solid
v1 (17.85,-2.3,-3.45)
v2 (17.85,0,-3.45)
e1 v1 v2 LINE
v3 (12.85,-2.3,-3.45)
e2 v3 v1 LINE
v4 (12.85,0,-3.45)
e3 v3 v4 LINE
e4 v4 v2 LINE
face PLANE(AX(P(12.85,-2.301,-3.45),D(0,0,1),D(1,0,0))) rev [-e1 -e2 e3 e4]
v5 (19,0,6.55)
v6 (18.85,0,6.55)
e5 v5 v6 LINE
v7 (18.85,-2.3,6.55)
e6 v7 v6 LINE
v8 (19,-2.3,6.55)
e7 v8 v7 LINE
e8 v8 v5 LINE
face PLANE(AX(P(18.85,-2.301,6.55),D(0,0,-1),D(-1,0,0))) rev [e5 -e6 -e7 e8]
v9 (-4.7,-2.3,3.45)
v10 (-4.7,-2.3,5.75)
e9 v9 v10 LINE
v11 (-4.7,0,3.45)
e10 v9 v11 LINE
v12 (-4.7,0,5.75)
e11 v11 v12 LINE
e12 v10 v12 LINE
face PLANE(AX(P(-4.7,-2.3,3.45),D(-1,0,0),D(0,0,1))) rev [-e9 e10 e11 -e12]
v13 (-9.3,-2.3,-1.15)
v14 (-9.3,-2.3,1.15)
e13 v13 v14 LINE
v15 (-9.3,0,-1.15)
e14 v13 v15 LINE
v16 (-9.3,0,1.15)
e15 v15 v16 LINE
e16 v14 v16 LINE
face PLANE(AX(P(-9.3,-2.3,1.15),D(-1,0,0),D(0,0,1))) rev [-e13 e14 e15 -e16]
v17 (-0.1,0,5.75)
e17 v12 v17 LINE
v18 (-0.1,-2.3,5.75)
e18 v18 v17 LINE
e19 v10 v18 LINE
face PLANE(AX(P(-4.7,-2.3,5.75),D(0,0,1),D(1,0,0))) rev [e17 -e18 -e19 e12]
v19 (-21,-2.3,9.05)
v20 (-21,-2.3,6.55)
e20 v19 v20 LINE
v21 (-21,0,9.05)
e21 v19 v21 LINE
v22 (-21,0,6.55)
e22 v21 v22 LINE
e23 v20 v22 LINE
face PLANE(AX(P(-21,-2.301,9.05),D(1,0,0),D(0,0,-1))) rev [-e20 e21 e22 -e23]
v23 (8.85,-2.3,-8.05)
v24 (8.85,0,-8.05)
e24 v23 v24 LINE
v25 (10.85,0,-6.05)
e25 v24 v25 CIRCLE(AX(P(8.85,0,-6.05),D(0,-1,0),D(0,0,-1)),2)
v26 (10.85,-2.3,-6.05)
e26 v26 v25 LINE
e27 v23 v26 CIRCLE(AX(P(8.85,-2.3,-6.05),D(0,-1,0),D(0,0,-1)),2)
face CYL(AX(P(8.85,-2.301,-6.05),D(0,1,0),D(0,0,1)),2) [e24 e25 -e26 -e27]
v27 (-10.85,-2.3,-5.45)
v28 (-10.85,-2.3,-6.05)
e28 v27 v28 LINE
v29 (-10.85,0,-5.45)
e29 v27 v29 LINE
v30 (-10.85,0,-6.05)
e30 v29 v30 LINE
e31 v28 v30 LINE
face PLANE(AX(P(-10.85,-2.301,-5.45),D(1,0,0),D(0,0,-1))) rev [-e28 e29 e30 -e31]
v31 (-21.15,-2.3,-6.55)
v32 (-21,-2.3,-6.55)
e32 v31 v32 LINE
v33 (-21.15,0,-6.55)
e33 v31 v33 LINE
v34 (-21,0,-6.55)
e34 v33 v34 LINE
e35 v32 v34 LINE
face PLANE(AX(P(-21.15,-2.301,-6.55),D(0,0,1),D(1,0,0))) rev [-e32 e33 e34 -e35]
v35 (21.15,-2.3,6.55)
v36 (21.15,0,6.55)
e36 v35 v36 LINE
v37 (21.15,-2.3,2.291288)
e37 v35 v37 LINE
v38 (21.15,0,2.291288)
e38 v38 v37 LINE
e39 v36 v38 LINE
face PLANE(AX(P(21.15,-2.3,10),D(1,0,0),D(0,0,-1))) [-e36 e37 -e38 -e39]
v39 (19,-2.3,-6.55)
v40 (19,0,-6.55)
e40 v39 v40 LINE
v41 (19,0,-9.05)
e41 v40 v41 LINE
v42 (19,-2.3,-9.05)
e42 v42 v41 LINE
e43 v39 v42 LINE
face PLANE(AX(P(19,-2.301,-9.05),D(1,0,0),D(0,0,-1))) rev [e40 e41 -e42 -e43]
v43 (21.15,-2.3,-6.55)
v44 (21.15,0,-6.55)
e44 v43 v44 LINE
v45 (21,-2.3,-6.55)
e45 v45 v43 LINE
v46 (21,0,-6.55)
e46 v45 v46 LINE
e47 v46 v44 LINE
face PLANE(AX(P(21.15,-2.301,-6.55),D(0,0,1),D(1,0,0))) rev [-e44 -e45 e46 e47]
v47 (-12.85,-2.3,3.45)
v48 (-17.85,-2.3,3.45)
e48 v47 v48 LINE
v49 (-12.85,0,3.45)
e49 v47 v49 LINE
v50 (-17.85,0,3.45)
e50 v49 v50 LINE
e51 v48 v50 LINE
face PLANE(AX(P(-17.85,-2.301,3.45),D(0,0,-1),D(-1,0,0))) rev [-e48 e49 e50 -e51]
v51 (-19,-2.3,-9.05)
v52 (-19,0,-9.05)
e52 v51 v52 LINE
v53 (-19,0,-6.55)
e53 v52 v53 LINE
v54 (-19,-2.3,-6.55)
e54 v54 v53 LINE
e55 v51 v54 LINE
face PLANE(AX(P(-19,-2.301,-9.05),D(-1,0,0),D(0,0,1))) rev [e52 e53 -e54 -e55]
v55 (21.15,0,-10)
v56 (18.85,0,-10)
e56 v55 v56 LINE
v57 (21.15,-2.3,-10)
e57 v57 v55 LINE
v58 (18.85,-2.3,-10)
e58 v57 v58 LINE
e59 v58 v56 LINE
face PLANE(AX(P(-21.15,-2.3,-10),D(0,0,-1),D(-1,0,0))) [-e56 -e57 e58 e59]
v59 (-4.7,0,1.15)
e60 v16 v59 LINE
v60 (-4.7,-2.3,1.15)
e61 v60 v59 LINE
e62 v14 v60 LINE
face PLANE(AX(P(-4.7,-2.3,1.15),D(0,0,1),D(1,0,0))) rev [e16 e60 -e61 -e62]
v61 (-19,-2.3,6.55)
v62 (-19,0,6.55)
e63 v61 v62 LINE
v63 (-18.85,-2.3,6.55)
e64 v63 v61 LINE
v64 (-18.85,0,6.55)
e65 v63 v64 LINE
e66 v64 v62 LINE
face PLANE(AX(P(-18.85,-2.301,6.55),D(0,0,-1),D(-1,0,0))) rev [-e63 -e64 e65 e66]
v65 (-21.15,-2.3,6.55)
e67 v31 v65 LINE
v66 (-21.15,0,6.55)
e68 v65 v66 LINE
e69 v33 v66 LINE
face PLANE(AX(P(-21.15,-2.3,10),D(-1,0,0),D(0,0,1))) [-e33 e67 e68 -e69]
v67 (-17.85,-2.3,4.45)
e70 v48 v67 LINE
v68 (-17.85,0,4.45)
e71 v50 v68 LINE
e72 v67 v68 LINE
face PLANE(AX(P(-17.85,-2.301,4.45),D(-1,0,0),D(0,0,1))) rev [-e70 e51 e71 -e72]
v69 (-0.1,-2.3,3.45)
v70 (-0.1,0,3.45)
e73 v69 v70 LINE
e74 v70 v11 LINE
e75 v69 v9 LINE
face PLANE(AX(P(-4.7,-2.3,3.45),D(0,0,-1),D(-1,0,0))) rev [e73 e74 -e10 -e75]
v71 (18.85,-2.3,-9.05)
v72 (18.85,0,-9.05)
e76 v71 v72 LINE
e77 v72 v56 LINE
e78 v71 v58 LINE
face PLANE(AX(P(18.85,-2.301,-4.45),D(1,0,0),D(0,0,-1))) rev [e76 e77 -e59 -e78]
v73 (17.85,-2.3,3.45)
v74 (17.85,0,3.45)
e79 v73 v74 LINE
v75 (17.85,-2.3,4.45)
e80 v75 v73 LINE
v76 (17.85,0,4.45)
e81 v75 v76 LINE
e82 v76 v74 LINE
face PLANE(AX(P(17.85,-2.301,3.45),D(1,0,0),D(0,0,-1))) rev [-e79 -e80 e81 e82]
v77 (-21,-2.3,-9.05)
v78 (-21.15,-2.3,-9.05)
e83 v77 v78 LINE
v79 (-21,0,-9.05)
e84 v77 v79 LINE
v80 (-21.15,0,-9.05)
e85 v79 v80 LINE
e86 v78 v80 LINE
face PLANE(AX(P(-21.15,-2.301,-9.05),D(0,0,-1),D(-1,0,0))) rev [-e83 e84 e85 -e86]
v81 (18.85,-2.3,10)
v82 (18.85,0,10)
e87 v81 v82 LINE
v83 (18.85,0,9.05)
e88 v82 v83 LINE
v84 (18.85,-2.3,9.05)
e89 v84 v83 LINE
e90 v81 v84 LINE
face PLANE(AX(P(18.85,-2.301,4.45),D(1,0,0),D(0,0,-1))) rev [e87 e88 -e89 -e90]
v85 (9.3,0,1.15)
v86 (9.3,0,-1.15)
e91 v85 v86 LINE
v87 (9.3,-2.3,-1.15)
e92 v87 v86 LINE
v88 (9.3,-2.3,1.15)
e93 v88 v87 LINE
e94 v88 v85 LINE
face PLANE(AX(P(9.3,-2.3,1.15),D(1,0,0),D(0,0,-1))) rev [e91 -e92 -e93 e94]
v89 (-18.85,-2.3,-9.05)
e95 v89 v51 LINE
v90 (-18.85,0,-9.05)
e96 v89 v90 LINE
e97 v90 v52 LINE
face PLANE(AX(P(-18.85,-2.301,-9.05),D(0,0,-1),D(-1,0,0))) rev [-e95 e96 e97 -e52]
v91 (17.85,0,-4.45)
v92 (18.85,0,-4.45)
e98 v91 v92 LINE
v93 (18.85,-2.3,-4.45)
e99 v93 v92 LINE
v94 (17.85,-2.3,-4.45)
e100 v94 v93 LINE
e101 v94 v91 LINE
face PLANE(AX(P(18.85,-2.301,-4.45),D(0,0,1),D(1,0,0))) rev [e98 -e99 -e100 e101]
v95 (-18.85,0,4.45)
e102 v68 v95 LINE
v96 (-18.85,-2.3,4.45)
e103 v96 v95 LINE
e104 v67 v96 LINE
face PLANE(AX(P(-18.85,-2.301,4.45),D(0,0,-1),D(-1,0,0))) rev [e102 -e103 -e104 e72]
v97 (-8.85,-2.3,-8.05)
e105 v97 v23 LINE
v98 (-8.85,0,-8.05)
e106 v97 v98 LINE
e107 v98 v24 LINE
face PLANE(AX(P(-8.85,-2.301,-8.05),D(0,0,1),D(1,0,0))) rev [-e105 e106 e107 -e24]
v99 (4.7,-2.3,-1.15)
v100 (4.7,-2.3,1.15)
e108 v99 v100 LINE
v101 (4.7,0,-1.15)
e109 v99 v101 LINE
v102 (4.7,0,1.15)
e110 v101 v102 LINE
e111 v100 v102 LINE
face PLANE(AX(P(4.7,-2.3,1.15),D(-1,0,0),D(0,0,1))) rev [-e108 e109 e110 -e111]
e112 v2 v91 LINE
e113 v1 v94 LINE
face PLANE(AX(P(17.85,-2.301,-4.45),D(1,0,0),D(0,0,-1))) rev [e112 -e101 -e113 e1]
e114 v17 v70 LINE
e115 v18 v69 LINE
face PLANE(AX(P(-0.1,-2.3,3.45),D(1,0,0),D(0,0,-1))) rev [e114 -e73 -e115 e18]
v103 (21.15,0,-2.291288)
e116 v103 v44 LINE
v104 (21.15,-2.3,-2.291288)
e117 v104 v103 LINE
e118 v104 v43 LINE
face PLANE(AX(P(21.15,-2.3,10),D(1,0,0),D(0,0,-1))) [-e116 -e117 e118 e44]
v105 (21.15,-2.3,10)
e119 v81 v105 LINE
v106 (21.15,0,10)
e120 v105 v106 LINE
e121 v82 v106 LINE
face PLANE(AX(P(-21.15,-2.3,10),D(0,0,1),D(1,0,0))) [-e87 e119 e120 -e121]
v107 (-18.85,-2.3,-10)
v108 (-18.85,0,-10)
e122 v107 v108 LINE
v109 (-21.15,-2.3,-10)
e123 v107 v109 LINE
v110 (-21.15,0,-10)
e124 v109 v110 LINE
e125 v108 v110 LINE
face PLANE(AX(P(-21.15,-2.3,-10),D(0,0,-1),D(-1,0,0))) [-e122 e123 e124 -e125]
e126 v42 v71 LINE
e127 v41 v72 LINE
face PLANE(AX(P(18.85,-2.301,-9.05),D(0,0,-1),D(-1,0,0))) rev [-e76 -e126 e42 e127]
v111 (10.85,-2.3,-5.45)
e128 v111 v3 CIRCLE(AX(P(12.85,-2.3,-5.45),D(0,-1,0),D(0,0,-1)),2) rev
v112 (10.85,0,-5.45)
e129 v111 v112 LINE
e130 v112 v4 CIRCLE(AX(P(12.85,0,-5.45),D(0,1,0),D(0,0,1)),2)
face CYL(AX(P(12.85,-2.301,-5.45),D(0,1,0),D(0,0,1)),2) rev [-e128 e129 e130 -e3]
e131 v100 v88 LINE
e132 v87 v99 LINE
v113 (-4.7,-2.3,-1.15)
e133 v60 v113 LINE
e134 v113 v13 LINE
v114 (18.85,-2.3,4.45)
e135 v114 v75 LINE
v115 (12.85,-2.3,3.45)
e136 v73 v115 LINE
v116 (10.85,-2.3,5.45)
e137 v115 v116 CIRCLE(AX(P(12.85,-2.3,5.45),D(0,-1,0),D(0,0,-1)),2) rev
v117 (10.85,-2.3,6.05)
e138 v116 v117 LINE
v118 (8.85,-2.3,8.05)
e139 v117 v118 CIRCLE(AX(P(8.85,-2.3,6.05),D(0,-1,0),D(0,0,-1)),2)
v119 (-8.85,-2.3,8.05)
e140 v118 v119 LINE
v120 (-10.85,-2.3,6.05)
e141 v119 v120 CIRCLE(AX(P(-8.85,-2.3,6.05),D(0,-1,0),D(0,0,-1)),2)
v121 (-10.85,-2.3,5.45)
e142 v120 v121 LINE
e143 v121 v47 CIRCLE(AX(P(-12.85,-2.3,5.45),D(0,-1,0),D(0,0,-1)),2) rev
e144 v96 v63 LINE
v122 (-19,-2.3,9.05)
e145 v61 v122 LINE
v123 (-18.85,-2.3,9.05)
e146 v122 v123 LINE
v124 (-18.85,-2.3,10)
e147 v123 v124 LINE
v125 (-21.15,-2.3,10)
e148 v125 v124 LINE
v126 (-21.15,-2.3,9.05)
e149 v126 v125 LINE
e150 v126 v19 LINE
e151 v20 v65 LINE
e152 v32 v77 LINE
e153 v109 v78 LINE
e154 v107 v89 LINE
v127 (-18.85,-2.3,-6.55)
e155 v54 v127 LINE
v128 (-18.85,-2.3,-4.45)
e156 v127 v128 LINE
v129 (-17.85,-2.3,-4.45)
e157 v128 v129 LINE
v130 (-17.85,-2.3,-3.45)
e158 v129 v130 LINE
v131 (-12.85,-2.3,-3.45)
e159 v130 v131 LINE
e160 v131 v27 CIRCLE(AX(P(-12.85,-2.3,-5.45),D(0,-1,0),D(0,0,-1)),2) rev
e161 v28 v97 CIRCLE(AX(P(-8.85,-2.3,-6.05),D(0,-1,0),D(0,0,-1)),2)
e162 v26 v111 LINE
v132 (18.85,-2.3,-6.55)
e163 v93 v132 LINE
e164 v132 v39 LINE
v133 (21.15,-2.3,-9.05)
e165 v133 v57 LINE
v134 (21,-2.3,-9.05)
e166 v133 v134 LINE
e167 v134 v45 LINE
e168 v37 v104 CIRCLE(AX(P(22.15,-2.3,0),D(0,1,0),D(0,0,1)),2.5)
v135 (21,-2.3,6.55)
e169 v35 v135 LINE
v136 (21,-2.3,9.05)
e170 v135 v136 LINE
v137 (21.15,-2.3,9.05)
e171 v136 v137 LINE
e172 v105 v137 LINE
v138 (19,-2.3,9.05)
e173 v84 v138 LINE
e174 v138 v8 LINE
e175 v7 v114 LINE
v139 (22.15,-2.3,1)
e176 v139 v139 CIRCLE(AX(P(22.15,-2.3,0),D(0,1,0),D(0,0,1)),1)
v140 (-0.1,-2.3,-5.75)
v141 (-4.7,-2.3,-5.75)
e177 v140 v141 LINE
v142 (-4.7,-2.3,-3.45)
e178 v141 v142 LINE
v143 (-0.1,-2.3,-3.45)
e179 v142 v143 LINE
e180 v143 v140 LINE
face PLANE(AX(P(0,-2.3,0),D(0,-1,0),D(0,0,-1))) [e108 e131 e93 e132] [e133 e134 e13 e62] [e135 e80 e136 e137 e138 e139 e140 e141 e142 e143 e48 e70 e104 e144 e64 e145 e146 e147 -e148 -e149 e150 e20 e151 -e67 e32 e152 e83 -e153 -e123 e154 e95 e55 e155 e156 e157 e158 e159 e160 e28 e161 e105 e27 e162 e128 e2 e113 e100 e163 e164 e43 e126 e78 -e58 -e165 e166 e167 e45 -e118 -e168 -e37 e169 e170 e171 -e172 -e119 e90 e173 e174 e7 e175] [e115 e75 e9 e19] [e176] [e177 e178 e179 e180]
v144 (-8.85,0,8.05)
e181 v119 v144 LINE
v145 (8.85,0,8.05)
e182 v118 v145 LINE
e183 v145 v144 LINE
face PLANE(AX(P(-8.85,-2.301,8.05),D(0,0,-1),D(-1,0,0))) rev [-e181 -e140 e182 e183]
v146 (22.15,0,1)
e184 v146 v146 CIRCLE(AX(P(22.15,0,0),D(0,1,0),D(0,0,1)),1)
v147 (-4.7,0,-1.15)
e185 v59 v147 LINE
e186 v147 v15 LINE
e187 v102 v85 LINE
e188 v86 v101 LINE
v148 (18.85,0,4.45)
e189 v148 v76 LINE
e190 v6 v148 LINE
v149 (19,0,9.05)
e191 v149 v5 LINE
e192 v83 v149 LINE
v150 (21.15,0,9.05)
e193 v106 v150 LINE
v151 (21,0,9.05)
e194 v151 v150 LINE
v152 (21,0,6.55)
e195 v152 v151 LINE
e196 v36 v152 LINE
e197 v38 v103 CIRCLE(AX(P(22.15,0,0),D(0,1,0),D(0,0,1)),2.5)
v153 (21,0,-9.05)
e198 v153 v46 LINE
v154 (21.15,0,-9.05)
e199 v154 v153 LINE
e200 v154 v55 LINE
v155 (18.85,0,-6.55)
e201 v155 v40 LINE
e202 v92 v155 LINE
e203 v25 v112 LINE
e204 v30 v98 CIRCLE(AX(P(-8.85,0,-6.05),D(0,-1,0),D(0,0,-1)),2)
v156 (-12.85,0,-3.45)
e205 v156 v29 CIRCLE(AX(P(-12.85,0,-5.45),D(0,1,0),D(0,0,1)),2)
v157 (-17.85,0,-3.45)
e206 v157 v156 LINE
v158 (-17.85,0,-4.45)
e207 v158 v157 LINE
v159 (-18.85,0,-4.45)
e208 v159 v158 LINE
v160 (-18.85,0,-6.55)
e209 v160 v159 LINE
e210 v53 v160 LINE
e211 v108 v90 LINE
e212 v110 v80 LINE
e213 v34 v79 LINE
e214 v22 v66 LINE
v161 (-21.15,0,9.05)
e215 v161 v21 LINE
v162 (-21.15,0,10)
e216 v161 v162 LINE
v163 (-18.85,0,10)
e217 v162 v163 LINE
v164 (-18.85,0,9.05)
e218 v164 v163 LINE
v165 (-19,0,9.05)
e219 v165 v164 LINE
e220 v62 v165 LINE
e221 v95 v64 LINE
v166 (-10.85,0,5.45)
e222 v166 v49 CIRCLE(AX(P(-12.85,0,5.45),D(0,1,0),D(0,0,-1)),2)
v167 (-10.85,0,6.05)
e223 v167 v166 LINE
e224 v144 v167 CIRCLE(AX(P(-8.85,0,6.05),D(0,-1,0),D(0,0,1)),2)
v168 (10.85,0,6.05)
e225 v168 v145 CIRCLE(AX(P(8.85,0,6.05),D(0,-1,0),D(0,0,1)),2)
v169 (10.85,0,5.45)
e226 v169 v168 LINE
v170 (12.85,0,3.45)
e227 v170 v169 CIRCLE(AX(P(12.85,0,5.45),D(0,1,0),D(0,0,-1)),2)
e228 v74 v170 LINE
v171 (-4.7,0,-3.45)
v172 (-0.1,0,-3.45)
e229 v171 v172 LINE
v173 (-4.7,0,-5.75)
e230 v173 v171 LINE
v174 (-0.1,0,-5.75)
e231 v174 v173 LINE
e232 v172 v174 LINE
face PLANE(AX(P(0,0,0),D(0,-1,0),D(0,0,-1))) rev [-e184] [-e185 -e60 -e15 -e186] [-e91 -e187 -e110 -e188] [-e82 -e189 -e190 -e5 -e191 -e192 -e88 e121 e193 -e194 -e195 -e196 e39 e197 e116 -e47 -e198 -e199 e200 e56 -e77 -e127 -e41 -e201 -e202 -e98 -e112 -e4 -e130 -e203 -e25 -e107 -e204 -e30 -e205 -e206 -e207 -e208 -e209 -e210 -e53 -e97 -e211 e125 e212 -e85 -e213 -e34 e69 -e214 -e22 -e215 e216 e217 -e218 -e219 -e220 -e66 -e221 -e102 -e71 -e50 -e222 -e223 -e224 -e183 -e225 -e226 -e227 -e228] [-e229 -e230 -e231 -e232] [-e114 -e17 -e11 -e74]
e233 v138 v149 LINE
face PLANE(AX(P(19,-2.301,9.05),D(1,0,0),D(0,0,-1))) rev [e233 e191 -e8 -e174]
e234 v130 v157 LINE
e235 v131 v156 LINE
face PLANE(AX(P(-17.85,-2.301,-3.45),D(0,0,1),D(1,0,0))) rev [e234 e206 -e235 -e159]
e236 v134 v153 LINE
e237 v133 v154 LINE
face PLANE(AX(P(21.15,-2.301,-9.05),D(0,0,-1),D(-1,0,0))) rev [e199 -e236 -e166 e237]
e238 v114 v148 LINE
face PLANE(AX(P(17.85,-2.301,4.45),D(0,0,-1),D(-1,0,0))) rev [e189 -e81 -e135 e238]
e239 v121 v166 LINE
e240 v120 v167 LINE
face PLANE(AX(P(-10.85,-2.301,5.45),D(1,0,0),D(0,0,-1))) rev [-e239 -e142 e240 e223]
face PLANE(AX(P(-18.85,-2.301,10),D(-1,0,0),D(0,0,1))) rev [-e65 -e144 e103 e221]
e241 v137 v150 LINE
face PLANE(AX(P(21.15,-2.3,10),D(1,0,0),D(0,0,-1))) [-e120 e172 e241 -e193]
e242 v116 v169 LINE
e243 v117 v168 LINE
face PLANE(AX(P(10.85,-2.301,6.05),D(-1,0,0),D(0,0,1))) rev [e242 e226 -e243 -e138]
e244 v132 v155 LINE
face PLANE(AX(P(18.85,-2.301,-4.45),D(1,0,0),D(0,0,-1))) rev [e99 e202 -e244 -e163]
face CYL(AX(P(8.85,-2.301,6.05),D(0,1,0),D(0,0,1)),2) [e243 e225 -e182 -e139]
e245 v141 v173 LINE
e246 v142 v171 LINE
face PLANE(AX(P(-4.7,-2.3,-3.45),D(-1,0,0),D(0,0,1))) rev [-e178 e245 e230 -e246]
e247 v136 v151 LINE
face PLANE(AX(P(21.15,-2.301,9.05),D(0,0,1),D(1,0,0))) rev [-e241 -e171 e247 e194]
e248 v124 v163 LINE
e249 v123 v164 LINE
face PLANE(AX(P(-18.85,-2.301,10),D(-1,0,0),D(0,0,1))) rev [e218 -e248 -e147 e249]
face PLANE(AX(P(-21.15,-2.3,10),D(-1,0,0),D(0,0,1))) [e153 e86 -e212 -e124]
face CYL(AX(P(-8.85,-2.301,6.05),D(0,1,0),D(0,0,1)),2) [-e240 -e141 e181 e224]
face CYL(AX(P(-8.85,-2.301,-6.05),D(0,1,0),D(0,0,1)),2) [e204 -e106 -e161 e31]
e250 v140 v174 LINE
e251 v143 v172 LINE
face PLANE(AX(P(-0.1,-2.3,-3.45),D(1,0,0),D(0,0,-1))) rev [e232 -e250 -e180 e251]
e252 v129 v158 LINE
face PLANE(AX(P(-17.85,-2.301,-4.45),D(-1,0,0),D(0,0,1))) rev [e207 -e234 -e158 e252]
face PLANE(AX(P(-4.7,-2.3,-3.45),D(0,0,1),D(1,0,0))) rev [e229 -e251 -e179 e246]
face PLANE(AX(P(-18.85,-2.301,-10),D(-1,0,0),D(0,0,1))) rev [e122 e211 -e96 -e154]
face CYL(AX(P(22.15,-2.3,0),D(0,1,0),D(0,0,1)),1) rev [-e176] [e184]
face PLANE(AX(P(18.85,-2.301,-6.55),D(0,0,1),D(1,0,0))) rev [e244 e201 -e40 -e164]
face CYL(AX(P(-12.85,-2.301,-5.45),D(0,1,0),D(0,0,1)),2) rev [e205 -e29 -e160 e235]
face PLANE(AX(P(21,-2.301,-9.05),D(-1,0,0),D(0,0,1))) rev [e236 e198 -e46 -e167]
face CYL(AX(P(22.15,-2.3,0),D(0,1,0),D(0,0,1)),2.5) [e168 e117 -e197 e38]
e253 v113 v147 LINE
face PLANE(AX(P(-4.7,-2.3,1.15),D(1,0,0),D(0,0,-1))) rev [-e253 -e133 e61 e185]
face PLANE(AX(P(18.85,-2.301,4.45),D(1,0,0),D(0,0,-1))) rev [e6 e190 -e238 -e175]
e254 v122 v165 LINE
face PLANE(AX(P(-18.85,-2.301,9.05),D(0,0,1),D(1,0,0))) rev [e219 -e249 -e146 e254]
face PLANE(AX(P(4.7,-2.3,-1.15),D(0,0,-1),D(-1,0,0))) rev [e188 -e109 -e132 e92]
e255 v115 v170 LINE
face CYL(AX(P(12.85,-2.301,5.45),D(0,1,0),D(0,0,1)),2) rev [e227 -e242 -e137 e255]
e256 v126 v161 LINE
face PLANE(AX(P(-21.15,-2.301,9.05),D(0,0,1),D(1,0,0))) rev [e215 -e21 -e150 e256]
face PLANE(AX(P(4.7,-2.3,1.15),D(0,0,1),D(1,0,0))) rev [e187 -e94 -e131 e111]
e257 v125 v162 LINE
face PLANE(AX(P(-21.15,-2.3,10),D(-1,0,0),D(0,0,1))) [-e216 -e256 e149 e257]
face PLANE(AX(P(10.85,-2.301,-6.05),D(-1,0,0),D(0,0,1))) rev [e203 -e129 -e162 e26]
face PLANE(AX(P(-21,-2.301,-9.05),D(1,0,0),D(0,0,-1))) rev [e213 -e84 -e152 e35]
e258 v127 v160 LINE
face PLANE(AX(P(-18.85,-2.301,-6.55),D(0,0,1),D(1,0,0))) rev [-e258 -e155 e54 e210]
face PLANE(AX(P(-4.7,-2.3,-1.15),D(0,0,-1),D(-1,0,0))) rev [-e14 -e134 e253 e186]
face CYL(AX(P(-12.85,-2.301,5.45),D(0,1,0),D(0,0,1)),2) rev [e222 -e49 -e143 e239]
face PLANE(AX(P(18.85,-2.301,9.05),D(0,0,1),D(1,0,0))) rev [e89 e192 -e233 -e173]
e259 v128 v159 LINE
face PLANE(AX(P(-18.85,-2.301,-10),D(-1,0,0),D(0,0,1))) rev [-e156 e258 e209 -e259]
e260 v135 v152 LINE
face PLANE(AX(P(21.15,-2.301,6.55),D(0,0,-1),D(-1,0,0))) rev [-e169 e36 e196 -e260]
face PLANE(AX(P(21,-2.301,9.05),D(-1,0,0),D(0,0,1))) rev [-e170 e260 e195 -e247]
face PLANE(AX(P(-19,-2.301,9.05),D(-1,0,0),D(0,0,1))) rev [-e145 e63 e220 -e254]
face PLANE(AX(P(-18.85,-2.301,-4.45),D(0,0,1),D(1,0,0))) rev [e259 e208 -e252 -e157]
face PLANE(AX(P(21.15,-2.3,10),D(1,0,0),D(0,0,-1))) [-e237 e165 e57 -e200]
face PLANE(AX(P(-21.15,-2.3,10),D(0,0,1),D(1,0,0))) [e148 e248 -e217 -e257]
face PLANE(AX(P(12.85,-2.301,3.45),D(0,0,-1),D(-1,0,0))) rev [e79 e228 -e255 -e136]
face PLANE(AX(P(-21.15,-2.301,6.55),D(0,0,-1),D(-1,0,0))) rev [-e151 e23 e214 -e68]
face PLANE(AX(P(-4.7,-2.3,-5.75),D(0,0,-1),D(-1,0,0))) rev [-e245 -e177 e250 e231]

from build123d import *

# Parameters (mm, degrees)
SKETCH1_W          = 42.3
SKETCH1_H          = 20
SKETCH1_W_2        = 4.6
SKETCH1_H_2        = 2.3
BASE_FLANGE1_DEPTH = 2.3
CUT_EXTRUDE1_REACH = 25.508
CUT_EXTRUDE2_REACH = 25.508
SKETCH7_W          = 0.15
SKETCH7_H          = 2.5
SKETCH8_R          = 2.5
SKETCH8_R_2        = 1
TAB1_DEPTH         = 2.3


# Sheet-metal steps are written as plain solids
with BuildPart() as part:
    # Sketch1 → Base-Flange1 (new body)
    with BuildSketch(Plane(origin=(0, 0, 0), x_dir=(1, 0, 0), z_dir=(0, 1, 0))):
        Rectangle(SKETCH1_W, SKETCH1_H)
        with Locations((-7, 0)):
            Rectangle(SKETCH1_W_2, SKETCH1_H_2, mode=Mode.SUBTRACT)
        with Locations((-2.4, -4.6)):
            Rectangle(SKETCH1_W_2, SKETCH1_H_2, mode=Mode.SUBTRACT)
        with Locations((7, 0)):
            Rectangle(SKETCH1_W_2, SKETCH1_H_2, mode=Mode.SUBTRACT)
        with Locations((-2.4, 4.6)):
            Rectangle(SKETCH1_W_2, SKETCH1_H_2, mode=Mode.SUBTRACT)
    extrude(amount=-BASE_FLANGE1_DEPTH)

    # Sketch6 → Cut-Extrude1 (cut, up to next)
    with BuildSketch(Plane(origin=(0, 0, 0), x_dir=(1, 0, 0), z_dir=(0, 1, 0)), mode=Mode.PRIVATE) as cut_extrude1_sk1:
        with BuildLine():
            Line((-18.85, 10), (-18.85, 4.45))
            Line((-18.85, 4.45), (-17.85, 4.45))
            Line((-17.85, 4.45), (-17.85, 3.45))
            Line((-17.85, 3.45), (-12.85, 3.45))
            ThreePointArc((-12.85, 3.45), (-11.435786438, 4.035786438), (-10.85, 5.45))
            Line((-10.85, 5.45), (-10.85, 6.05))
            ThreePointArc((-10.85, 6.05), (-10.264213562, 7.464213562), (-8.85, 8.05))
            Line((-8.85, 8.05), (8.85, 8.05))
            ThreePointArc((8.85, 8.05), (10.264213562, 7.464213562), (10.85, 6.05))
            Line((10.85, 6.05), (10.85, 5.45))
            ThreePointArc((10.85, 5.45), (11.435786438, 4.035786438), (12.85, 3.45))
            Line((12.85, 3.45), (17.85, 3.45))
            Line((17.85, 3.45), (17.85, 4.45))
            Line((17.85, 4.45), (18.85, 4.45))
            Line((18.85, 4.45), (18.85, 10))
            Line((18.85, 10), (-18.85, 10))
        make_face()
    cut_extrude1_tool1 = extrude(cut_extrude1_sk1.sketch, amount=-CUT_EXTRUDE1_REACH, mode=Mode.PRIVATE) & part.part
    # Sketch6 → Cut-Extrude1 (cut, up to next)
    with BuildSketch(Plane(origin=(0, 0, 0), x_dir=(1, 0, 0), z_dir=(0, 1, 0)), mode=Mode.PRIVATE) as cut_extrude1_sk2:
        with BuildLine():
            Line((18.85, -10), (-18.85, -10))
            Line((-18.85, -10), (-18.85, -4.45))
            Line((-18.85, -4.45), (-17.85, -4.45))
            Line((-17.85, -4.45), (-17.85, -3.45))
            Line((-17.85, -3.45), (-12.85, -3.45))
            ThreePointArc((-12.85, -3.45), (-11.435786438, -4.035786438), (-10.85, -5.45))
            Line((-10.85, -5.45), (-10.85, -6.05))
            ThreePointArc((-10.85, -6.05), (-10.264213562, -7.464213562), (-8.85, -8.05))
            Line((-8.85, -8.05), (8.85, -8.05))
            ThreePointArc((8.85, -8.05), (10.264213562, -7.464213562), (10.85, -6.05))
            Line((10.85, -6.05), (10.85, -5.45))
            ThreePointArc((10.85, -5.45), (11.435786438, -4.035786438), (12.85, -3.45))
            Line((12.85, -3.45), (17.85, -3.45))
            Line((17.85, -3.45), (17.85, -4.45))
            Line((17.85, -4.45), (18.85, -4.45))
            Line((18.85, -4.45), (18.85, -10))
        make_face()
    cut_extrude1_tool2 = extrude(cut_extrude1_sk2.sketch, amount=-CUT_EXTRUDE1_REACH, mode=Mode.PRIVATE) & part.part
    add(cut_extrude1_tool1.solids().sort_by_distance((15.35, 0, -3.832648))[0], mode=Mode.SUBTRACT)
    add(cut_extrude1_tool2.solids().sort_by_distance((15.35, 0, 3.832648))[0], mode=Mode.SUBTRACT)

    # Sketch7 → Cut-Extrude2 (cut, up to next)
    with BuildSketch(Plane(origin=(0, 0, 0), x_dir=(1, 0, 0), z_dir=(0, 1, 0)), mode=Mode.PRIVATE) as cut_extrude2_sk1:
        with Locations((-21.075, 7.8)):
            Rectangle(SKETCH7_W, SKETCH7_H)
    cut_extrude2_tool1 = extrude(cut_extrude2_sk1.sketch, amount=-CUT_EXTRUDE2_REACH, mode=Mode.PRIVATE) & part.part
    # Sketch7 → Cut-Extrude2 (cut, up to next)
    with BuildSketch(Plane(origin=(0, 0, 0), x_dir=(1, 0, 0), z_dir=(0, 1, 0)), mode=Mode.PRIVATE) as cut_extrude2_sk2:
        with Locations((-18.925, 7.8)):
            Rectangle(SKETCH7_W, SKETCH7_H)
    cut_extrude2_tool2 = extrude(cut_extrude2_sk2.sketch, amount=-CUT_EXTRUDE2_REACH, mode=Mode.PRIVATE) & part.part
    # Sketch7 → Cut-Extrude2 (cut, up to next)
    with BuildSketch(Plane(origin=(0, 0, 0), x_dir=(1, 0, 0), z_dir=(0, 1, 0)), mode=Mode.PRIVATE) as cut_extrude2_sk3:
        with Locations((-21.075, -7.8)):
            Rectangle(SKETCH7_W, SKETCH7_H)
    cut_extrude2_tool3 = extrude(cut_extrude2_sk3.sketch, amount=-CUT_EXTRUDE2_REACH, mode=Mode.PRIVATE) & part.part
    # Sketch7 → Cut-Extrude2 (cut, up to next)
    with BuildSketch(Plane(origin=(0, 0, 0), x_dir=(1, 0, 0), z_dir=(0, 1, 0)), mode=Mode.PRIVATE) as cut_extrude2_sk4:
        with Locations((-18.925, -7.8)):
            Rectangle(SKETCH7_W, SKETCH7_H)
    cut_extrude2_tool4 = extrude(cut_extrude2_sk4.sketch, amount=-CUT_EXTRUDE2_REACH, mode=Mode.PRIVATE) & part.part
    # Sketch7 → Cut-Extrude2 (cut, up to next)
    with BuildSketch(Plane(origin=(0, 0, 0), x_dir=(1, 0, 0), z_dir=(0, 1, 0)), mode=Mode.PRIVATE) as cut_extrude2_sk5:
        with Locations((21.075, -7.8)):
            Rectangle(SKETCH7_W, SKETCH7_H)
    cut_extrude2_tool5 = extrude(cut_extrude2_sk5.sketch, amount=-CUT_EXTRUDE2_REACH, mode=Mode.PRIVATE) & part.part
    # Sketch7 → Cut-Extrude2 (cut, up to next)
    with BuildSketch(Plane(origin=(0, 0, 0), x_dir=(1, 0, 0), z_dir=(0, 1, 0)), mode=Mode.PRIVATE) as cut_extrude2_sk6:
        with Locations((18.925, -7.8)):
            Rectangle(SKETCH7_W, SKETCH7_H)
    cut_extrude2_tool6 = extrude(cut_extrude2_sk6.sketch, amount=-CUT_EXTRUDE2_REACH, mode=Mode.PRIVATE) & part.part
    # Sketch7 → Cut-Extrude2 (cut, up to next)
    with BuildSketch(Plane(origin=(0, 0, 0), x_dir=(1, 0, 0), z_dir=(0, 1, 0)), mode=Mode.PRIVATE) as cut_extrude2_sk7:
        with Locations((21.075, 7.8)):
            Rectangle(SKETCH7_W, SKETCH7_H)
    cut_extrude2_tool7 = extrude(cut_extrude2_sk7.sketch, amount=-CUT_EXTRUDE2_REACH, mode=Mode.PRIVATE) & part.part
    # Sketch7 → Cut-Extrude2 (cut, up to next)
    with BuildSketch(Plane(origin=(0, 0, 0), x_dir=(1, 0, 0), z_dir=(0, 1, 0)), mode=Mode.PRIVATE) as cut_extrude2_sk8:
        with Locations((18.925, 7.8)):
            Rectangle(SKETCH7_W, SKETCH7_H)
    cut_extrude2_tool8 = extrude(cut_extrude2_sk8.sketch, amount=-CUT_EXTRUDE2_REACH, mode=Mode.PRIVATE) & part.part
    add(cut_extrude2_tool1.solids().sort_by_distance((-21.075, 0, -7.8))[0], mode=Mode.SUBTRACT)
    add(cut_extrude2_tool2.solids().sort_by_distance((-18.925, 0, -7.8))[0], mode=Mode.SUBTRACT)
    add(cut_extrude2_tool3.solids().sort_by_distance((-21.075, 0, 7.8))[0], mode=Mode.SUBTRACT)
    add(cut_extrude2_tool4.solids().sort_by_distance((-18.925, 0, 7.8))[0], mode=Mode.SUBTRACT)
    add(cut_extrude2_tool5.solids().sort_by_distance((21.075, 0, 7.8))[0], mode=Mode.SUBTRACT)
    add(cut_extrude2_tool6.solids().sort_by_distance((18.925, 0, 7.8))[0], mode=Mode.SUBTRACT)
    add(cut_extrude2_tool7.solids().sort_by_distance((21.075, 0, -7.8))[0], mode=Mode.SUBTRACT)
    add(cut_extrude2_tool8.solids().sort_by_distance((18.925, 0, -7.8))[0], mode=Mode.SUBTRACT)

    # Sketch8 → Tab1 (add)
    with BuildSketch(Plane(origin=(0, 0, 0), x_dir=(1, 0, 0), z_dir=(0, 1, 0))):
        with Locations((22.15, 0)):
            Circle(SKETCH8_R)
        with Locations(Location((22.15, 0, 0), (0, 0, 270))):
            Circle(SKETCH8_R_2, mode=Mode.SUBTRACT)
    extrude(amount=-TAB1_DEPTH)


solid = part.part
